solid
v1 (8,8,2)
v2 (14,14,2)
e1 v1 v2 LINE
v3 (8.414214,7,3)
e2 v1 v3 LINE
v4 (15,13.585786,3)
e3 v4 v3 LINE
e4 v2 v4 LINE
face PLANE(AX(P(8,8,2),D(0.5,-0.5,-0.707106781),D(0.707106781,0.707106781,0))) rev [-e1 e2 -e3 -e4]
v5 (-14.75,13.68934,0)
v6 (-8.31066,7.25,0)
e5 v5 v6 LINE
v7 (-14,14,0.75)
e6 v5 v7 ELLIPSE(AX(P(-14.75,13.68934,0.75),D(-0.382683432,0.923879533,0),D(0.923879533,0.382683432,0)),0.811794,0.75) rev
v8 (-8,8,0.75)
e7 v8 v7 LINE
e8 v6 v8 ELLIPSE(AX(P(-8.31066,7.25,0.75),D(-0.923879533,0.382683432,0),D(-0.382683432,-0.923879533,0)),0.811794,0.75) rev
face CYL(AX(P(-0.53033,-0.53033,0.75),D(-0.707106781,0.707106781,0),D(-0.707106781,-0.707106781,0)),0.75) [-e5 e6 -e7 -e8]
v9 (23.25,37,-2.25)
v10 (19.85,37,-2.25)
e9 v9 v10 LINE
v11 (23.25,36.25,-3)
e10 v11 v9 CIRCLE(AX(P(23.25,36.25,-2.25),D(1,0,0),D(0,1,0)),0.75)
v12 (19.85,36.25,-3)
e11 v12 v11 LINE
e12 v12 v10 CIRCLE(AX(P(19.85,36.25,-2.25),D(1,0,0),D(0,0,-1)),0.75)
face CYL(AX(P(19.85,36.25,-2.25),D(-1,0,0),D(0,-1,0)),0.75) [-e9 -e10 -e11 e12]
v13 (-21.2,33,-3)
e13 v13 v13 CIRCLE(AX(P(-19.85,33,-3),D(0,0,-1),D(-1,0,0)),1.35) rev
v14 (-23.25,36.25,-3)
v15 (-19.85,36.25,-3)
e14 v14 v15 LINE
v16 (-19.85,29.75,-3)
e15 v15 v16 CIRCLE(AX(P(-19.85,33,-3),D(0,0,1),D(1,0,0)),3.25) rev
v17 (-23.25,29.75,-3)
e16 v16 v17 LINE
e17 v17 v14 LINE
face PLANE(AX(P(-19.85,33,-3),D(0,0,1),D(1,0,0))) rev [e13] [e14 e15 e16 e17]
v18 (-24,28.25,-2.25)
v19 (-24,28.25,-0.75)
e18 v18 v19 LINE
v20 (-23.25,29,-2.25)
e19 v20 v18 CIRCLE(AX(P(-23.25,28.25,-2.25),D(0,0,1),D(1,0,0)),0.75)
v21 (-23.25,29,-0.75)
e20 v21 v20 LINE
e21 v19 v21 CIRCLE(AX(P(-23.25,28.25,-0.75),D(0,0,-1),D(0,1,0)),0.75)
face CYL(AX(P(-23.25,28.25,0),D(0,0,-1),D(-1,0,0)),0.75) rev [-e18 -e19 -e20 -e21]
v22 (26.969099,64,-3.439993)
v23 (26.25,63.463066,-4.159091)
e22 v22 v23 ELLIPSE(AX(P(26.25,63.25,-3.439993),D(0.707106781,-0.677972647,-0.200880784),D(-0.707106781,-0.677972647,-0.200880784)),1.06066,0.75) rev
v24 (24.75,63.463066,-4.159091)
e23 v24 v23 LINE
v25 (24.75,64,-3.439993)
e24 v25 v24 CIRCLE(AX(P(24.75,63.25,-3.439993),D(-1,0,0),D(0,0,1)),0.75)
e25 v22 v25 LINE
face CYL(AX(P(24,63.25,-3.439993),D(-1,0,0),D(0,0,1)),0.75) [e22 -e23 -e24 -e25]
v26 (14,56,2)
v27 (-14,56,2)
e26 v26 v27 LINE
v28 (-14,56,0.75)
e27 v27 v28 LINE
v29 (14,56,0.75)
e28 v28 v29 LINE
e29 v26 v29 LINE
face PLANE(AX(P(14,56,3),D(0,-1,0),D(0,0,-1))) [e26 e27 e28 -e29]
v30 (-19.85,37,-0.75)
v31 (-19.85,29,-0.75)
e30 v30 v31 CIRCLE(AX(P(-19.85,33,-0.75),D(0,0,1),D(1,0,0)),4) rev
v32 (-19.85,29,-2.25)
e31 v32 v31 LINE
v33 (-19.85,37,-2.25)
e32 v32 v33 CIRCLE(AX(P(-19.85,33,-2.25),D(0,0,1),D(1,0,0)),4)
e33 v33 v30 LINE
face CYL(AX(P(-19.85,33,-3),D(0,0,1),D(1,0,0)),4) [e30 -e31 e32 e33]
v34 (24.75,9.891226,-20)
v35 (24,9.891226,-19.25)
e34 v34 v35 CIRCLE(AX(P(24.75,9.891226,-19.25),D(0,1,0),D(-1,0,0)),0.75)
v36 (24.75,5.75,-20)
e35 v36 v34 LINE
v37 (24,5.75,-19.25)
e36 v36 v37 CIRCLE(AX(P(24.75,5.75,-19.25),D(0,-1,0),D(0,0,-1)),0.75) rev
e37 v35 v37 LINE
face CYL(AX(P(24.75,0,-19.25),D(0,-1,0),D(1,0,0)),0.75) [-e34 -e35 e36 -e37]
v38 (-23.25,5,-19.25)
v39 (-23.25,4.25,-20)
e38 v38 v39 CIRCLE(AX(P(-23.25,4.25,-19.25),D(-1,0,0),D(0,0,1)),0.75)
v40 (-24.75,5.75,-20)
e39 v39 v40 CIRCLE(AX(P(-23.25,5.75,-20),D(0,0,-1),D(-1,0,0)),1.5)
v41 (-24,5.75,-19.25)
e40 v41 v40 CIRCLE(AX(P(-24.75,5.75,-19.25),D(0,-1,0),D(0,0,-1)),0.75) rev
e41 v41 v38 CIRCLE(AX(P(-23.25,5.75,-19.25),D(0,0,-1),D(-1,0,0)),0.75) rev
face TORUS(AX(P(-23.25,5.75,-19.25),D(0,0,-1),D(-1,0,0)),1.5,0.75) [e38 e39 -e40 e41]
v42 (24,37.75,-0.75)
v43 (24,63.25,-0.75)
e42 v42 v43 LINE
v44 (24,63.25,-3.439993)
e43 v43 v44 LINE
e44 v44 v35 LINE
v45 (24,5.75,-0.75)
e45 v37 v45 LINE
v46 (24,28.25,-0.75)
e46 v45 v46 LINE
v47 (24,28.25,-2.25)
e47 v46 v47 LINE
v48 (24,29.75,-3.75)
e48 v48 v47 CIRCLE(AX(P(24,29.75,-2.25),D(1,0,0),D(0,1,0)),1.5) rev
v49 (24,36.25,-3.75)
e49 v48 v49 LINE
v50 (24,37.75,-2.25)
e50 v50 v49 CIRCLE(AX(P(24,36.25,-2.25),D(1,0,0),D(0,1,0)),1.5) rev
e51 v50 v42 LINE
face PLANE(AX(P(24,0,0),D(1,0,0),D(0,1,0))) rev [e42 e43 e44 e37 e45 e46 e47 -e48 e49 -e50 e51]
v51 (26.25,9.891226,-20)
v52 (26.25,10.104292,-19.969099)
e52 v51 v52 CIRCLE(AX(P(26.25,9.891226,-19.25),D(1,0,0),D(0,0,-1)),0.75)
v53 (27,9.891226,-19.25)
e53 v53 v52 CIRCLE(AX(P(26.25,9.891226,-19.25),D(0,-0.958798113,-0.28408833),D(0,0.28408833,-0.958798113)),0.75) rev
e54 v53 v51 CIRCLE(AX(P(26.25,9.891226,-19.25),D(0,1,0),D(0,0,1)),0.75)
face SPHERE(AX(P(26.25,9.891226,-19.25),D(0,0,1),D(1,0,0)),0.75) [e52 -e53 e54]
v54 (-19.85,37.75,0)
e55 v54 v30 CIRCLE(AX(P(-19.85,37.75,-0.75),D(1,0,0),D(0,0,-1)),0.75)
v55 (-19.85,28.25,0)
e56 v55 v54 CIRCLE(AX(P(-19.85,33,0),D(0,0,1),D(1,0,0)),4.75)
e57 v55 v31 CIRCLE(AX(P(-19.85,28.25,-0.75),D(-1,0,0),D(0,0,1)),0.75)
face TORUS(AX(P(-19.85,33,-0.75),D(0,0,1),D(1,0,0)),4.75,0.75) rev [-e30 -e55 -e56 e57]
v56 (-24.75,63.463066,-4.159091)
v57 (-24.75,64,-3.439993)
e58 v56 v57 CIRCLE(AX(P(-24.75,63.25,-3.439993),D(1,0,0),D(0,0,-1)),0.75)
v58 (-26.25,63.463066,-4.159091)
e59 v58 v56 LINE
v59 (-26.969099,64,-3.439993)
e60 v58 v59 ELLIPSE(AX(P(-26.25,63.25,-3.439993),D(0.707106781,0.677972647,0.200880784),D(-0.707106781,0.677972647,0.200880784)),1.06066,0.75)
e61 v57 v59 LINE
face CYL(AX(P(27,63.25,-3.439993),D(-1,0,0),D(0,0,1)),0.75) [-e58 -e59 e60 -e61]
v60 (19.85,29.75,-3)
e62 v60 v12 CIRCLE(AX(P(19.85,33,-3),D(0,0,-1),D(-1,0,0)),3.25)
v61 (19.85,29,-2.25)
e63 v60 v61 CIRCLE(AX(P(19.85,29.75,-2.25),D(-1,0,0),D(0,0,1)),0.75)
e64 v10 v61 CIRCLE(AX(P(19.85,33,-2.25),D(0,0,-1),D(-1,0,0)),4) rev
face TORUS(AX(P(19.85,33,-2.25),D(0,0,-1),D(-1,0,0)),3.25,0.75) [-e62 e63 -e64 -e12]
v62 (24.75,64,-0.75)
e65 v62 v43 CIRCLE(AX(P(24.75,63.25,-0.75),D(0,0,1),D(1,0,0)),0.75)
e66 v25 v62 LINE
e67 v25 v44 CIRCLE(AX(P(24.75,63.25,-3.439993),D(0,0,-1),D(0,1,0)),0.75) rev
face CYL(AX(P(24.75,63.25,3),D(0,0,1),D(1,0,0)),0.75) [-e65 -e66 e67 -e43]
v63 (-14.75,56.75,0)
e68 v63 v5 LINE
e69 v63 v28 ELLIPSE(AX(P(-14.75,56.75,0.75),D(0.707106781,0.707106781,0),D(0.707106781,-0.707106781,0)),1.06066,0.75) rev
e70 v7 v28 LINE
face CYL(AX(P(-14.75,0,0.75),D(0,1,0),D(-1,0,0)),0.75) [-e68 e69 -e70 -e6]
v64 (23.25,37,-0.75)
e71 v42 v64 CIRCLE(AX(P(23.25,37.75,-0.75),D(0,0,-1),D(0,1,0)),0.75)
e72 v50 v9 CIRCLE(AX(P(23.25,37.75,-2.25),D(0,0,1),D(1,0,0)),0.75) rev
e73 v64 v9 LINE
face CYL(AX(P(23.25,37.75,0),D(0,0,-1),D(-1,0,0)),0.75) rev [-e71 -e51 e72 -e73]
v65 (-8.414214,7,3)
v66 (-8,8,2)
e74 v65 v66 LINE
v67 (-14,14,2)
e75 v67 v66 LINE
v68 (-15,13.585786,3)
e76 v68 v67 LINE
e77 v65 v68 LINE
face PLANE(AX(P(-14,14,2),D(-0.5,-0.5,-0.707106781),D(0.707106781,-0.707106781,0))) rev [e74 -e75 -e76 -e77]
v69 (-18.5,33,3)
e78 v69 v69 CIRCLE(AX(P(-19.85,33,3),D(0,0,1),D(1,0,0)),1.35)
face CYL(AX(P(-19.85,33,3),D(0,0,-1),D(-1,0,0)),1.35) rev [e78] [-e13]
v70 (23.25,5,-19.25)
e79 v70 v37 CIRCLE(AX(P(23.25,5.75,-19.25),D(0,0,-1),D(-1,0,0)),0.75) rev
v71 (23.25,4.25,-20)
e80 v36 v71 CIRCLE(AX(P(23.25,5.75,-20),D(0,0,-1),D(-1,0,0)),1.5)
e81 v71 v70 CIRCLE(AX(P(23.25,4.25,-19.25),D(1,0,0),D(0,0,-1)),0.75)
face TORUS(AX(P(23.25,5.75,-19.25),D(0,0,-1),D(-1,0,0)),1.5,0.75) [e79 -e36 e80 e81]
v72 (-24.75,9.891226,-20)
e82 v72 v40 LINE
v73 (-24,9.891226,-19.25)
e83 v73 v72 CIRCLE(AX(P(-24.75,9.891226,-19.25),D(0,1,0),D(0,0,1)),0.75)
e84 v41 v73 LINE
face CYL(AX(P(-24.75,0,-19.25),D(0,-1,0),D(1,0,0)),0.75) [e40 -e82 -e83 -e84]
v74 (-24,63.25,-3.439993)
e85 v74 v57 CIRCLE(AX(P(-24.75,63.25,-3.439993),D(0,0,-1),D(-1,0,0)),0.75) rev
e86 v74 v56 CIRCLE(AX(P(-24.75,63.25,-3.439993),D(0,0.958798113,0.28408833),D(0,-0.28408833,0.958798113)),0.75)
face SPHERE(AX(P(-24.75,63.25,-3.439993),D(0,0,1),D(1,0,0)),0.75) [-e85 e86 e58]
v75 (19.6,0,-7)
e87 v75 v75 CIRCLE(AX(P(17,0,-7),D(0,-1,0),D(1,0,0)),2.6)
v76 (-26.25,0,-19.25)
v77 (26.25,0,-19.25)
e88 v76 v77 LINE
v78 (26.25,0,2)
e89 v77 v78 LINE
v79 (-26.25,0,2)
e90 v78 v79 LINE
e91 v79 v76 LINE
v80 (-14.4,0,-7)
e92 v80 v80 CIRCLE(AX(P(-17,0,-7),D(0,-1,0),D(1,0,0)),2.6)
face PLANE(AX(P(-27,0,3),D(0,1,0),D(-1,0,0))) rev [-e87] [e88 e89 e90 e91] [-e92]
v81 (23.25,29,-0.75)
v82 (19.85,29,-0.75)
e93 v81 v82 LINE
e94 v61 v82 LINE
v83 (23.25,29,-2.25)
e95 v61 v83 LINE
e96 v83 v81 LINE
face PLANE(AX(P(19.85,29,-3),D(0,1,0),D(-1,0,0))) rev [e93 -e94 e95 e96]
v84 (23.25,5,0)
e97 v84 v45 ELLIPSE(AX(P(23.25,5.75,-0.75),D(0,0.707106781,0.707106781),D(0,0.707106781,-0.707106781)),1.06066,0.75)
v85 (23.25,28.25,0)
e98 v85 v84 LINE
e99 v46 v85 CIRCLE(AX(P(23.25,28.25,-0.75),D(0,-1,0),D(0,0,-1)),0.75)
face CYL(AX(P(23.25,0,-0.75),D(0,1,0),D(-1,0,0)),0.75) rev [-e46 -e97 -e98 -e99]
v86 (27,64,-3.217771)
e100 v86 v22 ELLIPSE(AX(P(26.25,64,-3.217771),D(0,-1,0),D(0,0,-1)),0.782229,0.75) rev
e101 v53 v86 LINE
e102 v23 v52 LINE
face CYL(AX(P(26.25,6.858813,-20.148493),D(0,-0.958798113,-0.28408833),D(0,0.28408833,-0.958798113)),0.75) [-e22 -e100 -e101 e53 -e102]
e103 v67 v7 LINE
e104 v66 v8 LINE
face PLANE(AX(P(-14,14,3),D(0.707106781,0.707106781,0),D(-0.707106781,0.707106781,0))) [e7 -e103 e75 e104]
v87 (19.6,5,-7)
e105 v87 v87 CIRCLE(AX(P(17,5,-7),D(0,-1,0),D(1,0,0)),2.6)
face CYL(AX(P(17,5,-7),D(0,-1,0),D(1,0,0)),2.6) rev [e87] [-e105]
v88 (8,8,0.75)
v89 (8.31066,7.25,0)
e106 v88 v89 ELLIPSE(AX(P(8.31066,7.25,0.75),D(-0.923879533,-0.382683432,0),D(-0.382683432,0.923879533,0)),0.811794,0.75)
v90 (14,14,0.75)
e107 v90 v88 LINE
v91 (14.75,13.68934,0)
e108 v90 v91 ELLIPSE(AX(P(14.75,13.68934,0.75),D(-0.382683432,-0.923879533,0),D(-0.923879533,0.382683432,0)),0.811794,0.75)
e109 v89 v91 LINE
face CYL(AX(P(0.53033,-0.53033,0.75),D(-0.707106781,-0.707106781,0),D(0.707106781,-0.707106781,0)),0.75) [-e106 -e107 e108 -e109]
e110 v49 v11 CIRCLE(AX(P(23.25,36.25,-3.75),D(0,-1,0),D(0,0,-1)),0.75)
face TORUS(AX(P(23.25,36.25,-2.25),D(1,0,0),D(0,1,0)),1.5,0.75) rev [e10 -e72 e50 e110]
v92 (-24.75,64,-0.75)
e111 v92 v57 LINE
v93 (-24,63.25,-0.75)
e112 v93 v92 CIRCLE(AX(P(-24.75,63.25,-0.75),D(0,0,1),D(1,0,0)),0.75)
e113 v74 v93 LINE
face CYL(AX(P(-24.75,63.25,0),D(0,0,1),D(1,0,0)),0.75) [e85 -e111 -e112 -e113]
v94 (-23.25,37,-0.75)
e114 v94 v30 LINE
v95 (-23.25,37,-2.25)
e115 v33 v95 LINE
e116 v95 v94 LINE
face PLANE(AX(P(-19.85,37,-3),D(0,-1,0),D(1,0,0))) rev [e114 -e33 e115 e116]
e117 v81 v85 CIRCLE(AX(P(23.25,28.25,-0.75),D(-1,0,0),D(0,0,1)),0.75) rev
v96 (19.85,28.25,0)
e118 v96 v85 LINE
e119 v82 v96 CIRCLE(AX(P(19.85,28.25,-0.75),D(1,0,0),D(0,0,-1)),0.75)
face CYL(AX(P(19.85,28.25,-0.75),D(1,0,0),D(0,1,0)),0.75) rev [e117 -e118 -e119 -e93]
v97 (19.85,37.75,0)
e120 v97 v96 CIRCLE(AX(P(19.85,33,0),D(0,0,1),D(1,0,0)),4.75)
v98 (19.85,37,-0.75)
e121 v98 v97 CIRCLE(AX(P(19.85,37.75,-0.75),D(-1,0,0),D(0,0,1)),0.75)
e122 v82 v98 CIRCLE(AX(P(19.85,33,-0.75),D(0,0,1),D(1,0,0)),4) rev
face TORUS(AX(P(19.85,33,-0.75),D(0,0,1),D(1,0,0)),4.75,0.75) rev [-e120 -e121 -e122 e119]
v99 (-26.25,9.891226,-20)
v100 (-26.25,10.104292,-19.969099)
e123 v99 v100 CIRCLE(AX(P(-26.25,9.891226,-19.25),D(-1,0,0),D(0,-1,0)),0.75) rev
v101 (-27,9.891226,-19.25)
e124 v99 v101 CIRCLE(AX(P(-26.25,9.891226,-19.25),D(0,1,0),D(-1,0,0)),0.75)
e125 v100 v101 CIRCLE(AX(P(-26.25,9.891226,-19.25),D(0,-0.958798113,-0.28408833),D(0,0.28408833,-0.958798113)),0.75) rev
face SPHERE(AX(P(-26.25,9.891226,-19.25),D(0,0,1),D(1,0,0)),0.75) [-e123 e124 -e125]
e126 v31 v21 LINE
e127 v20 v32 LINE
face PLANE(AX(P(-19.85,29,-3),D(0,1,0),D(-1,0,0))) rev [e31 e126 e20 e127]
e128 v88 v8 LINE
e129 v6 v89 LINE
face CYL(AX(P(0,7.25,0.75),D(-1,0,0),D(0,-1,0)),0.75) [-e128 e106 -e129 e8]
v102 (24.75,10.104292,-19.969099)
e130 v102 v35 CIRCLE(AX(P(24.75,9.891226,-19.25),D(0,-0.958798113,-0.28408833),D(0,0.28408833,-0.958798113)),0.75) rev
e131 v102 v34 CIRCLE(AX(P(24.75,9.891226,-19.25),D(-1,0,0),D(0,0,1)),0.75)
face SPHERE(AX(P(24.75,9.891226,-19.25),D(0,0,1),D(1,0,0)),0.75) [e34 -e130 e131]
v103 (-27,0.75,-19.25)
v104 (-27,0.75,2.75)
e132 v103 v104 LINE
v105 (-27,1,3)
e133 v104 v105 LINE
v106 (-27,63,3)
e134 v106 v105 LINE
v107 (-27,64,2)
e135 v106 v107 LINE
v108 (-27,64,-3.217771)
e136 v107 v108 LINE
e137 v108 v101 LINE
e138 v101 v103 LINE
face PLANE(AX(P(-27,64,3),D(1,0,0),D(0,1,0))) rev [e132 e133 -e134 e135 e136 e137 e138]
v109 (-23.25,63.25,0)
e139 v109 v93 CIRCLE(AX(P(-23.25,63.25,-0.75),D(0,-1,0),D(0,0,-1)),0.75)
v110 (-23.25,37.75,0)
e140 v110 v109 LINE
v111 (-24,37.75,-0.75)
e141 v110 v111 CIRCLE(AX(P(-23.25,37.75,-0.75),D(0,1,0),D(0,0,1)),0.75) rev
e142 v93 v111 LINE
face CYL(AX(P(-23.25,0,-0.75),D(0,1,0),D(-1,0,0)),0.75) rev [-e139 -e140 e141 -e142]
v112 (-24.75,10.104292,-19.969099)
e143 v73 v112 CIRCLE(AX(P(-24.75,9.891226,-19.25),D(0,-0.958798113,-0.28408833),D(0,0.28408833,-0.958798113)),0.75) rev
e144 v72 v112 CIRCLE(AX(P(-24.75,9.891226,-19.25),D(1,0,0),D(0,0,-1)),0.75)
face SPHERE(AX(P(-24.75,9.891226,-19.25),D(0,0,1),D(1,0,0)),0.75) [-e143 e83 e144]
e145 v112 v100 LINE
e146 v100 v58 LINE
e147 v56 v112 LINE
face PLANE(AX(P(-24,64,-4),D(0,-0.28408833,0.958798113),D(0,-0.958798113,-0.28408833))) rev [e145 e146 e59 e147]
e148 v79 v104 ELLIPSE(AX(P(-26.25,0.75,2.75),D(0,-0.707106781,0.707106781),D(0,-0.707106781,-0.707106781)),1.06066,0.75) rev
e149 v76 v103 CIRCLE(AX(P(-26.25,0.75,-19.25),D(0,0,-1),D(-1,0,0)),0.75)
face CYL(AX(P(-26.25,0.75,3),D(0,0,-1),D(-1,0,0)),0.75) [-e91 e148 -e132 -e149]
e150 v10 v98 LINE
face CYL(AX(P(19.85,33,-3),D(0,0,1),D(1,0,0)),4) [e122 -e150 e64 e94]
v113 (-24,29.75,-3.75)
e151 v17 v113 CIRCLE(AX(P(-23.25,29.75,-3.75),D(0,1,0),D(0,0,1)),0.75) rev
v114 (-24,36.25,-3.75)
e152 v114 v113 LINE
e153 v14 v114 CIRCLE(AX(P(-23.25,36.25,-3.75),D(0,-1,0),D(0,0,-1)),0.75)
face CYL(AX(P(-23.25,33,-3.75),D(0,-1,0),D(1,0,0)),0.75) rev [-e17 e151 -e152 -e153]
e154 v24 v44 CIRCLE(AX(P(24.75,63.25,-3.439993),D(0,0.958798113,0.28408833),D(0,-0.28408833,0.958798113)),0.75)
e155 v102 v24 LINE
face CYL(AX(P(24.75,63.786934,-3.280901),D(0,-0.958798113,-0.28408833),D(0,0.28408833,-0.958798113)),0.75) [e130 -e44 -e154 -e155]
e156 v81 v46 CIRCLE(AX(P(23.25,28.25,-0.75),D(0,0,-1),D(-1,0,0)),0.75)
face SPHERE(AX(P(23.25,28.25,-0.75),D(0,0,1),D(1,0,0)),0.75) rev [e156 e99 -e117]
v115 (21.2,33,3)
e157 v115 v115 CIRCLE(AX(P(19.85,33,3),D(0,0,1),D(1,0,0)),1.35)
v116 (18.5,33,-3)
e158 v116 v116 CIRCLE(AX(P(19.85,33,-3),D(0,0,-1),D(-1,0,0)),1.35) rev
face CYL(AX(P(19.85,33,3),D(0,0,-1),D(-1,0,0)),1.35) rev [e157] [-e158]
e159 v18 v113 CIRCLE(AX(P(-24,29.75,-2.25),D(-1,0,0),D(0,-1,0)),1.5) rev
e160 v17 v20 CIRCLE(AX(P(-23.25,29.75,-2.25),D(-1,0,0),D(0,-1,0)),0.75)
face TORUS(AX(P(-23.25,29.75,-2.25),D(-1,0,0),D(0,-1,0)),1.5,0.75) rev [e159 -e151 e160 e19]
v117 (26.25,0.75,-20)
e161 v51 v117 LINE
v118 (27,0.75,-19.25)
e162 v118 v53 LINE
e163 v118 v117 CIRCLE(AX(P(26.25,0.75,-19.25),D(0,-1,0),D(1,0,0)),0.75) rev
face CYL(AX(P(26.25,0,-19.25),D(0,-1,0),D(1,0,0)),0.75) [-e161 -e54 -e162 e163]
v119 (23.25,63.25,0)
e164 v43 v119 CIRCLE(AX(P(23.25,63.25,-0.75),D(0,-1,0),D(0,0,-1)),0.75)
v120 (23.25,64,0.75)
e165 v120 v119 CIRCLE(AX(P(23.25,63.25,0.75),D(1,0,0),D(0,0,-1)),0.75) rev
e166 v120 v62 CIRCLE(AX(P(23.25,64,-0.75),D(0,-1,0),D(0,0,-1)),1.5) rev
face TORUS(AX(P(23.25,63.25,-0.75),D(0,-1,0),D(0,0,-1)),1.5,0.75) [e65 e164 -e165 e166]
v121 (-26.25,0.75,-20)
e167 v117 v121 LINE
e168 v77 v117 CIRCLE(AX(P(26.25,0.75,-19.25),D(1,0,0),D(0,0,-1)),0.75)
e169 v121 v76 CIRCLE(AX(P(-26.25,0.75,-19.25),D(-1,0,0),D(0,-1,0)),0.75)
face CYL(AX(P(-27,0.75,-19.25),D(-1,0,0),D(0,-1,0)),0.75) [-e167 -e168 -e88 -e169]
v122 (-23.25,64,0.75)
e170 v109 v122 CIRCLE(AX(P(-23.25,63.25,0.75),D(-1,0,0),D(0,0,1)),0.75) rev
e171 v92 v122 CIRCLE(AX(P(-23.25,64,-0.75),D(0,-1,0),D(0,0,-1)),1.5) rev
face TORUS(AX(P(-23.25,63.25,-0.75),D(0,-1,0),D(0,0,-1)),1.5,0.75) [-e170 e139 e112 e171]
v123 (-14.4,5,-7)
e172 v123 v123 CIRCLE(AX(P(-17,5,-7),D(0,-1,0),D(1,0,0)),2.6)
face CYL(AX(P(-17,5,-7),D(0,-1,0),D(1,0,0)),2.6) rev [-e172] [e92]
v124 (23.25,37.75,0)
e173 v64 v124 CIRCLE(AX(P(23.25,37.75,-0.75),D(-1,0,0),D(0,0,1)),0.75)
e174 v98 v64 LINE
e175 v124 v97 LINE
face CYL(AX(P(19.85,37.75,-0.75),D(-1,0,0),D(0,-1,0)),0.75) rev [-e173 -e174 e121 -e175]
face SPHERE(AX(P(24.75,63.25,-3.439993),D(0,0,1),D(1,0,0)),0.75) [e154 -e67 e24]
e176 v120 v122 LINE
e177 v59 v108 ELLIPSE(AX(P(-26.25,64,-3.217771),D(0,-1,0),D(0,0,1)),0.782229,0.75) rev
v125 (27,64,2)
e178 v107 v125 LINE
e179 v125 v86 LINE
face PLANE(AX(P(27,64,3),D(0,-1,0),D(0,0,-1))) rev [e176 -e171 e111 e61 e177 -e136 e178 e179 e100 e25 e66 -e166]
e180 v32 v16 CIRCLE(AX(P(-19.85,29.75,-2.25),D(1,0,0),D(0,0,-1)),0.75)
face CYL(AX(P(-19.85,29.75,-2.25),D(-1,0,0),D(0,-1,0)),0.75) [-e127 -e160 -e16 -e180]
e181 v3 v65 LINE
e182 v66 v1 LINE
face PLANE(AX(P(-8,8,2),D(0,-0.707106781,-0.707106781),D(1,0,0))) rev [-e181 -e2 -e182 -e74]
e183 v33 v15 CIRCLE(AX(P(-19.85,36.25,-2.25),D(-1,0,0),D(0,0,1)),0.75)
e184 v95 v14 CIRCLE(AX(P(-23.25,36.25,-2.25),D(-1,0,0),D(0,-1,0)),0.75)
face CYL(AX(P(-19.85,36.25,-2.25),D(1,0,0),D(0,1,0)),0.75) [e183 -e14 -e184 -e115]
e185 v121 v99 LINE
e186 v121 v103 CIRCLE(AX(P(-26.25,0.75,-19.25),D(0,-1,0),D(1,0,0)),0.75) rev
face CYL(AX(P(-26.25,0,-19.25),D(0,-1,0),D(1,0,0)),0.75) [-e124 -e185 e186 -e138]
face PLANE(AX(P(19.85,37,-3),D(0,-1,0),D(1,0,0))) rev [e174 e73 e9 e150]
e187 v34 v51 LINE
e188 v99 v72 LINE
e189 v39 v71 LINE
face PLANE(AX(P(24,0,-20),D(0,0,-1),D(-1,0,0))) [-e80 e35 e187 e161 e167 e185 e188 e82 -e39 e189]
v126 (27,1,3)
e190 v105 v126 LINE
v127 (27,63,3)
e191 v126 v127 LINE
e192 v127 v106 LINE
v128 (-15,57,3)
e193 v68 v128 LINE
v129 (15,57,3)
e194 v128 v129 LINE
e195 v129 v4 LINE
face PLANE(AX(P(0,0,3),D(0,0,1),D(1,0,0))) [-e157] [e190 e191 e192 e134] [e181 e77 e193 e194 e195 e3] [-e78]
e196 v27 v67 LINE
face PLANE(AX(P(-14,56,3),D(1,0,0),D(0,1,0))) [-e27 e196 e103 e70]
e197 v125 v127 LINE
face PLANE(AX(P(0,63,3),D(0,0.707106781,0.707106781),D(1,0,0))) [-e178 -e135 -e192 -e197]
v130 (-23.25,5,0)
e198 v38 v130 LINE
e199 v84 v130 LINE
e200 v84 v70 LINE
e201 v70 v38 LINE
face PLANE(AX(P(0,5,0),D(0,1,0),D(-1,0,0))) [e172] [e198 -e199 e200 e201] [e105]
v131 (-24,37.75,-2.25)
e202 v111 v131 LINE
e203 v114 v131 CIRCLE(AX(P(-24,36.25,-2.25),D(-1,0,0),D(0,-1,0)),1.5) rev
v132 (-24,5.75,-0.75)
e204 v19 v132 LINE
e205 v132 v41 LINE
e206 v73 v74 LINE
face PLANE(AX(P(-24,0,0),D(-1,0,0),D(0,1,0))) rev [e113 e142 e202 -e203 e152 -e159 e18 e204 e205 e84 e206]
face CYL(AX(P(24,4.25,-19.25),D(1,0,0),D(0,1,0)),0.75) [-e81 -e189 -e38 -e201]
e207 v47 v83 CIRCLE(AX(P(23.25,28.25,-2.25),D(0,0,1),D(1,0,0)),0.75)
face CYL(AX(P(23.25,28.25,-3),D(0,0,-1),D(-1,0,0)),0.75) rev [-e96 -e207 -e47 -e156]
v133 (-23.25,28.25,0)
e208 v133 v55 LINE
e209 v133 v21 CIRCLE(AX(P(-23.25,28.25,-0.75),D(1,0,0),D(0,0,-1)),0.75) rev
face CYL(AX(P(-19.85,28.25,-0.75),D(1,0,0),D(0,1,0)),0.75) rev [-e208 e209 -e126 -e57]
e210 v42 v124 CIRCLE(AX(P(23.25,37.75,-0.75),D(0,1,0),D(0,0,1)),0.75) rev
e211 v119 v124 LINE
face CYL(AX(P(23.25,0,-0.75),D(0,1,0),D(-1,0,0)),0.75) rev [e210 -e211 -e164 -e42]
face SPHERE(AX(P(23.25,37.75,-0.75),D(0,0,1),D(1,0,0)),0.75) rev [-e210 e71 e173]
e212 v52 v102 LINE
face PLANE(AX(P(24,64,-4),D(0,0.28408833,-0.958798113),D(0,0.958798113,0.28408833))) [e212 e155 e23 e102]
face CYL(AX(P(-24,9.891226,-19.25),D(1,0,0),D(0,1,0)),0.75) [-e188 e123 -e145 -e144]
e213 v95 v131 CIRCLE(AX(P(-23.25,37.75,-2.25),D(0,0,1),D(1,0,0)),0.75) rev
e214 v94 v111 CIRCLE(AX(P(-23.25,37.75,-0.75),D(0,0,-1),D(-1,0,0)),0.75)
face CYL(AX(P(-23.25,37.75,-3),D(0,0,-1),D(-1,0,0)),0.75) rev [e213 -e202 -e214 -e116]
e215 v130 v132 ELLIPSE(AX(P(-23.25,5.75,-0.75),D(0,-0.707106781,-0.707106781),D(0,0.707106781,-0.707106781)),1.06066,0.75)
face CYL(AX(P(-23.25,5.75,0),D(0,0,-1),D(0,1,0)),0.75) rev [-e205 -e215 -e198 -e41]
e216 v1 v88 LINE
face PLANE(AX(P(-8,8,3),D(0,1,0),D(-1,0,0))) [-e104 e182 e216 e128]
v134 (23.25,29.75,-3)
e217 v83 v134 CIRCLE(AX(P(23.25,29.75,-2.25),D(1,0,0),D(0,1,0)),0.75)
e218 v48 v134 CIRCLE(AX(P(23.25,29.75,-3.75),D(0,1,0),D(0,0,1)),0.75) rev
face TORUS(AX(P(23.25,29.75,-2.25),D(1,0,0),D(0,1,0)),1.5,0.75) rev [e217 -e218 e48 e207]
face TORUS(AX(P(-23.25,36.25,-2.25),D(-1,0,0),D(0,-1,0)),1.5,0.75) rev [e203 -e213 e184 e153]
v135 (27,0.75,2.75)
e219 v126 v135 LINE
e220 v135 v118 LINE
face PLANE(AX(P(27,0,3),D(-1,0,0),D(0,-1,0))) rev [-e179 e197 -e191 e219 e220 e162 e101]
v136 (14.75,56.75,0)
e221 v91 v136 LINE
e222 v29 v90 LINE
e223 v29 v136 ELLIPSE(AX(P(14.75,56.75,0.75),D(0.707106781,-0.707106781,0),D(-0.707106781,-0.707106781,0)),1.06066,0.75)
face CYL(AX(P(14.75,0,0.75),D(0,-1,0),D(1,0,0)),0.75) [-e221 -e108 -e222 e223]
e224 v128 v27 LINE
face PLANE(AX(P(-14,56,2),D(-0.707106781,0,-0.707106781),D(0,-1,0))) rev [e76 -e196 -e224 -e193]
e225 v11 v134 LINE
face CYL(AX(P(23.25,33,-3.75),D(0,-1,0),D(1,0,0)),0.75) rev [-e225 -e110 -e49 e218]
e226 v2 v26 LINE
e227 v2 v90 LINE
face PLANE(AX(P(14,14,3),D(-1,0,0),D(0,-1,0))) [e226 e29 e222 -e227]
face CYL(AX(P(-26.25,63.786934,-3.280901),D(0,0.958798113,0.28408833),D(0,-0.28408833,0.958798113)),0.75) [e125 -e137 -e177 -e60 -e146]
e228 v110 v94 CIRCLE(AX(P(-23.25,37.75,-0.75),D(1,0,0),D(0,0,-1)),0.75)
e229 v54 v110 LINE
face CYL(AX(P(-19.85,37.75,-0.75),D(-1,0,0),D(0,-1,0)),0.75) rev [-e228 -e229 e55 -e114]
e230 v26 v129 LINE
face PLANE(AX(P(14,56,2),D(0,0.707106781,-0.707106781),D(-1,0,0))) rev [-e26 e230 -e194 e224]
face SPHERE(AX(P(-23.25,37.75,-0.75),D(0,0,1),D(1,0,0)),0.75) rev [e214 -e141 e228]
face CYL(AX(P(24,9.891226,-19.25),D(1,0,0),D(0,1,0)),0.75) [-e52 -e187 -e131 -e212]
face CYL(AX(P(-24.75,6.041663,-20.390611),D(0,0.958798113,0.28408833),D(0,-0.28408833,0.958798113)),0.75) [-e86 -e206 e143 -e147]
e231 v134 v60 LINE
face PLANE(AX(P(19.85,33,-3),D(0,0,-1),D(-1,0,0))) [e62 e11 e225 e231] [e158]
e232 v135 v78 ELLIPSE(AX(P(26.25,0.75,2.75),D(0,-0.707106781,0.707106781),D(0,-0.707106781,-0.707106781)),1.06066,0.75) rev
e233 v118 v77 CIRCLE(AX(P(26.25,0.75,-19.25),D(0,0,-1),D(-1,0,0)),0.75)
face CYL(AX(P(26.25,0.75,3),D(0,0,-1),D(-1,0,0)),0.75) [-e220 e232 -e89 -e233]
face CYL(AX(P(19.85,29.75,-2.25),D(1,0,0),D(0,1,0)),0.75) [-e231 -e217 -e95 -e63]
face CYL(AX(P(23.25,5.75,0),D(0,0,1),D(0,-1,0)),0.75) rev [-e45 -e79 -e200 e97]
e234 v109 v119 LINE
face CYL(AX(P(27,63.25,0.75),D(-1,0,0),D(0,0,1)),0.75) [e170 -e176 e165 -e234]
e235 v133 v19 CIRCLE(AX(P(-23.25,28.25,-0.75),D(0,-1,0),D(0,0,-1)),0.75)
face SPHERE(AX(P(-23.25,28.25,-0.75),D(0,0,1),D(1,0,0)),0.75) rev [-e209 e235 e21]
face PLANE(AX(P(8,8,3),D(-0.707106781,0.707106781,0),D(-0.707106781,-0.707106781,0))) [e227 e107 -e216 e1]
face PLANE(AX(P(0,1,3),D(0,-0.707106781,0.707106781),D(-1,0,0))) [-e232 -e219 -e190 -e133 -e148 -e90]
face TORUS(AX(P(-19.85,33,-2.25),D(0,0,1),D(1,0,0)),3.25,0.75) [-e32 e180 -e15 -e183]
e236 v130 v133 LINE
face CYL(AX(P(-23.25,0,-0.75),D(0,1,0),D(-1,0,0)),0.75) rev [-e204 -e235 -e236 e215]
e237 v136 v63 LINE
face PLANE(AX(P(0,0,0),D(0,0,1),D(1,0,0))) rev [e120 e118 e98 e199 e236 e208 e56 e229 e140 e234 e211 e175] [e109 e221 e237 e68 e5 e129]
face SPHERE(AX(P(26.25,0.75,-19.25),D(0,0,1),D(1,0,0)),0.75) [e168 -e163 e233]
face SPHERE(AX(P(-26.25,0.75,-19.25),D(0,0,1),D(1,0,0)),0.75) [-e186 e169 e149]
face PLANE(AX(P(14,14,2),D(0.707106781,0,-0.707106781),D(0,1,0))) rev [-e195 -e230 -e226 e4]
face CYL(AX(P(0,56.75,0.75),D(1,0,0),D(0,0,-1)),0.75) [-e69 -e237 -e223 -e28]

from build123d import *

# Parameters (mm, degrees)
SKETCH1_W           = 54
SKETCH1_H           = 64
SKETCH1_R           = 1.35
BOSS_EXTRUDE1_DEPTH = 3
BOSS_EXTRUDE2_DEPTH = 3
BOSS_EXTRUDE3_DEPTH = 3
CUT_EXTRUDE2_START  = -3
SKETCH4_R           = 1.35
CUT_EXTRUDE2_DEPTH  = 3
SKETCH5_W           = 48
SKETCH5_H           = 20
SKETCH5_R           = 2.6
BOSS_EXTRUDE4_DEPTH = 5
FILLET3_R           = 0.75
CHAMFER1_SIZE       = 1


with BuildPart() as part:
    # Sketch1 → Boss-Extrude1 (new body)
    with BuildSketch(Plane.XY):
        with Locations((0, 32)):
            Rectangle(SKETCH1_W, SKETCH1_H)
        with Locations((-19.85, 33)):
            Circle(SKETCH1_R, mode=Mode.SUBTRACT)
        with Locations((19.85, 33)):
            Circle(SKETCH1_R, mode=Mode.SUBTRACT)
        Polygon((-8, 8), (8, 8), (14, 14), (14, 56), (-14, 56), (-14, 14), align=None, mode=Mode.SUBTRACT)
    extrude(amount=BOSS_EXTRUDE1_DEPTH)

    # Sketch2 → Boss-Extrude2 (add)
    with BuildSketch(Plane(origin=(27, 0, 0), x_dir=(0, 0, -1), z_dir=(1, 0, 0))):
        Polygon((0, 64), (0, 0), (20, 0), (20, 10), (4, 64), align=None)
    boss_extrude2 = extrude(amount=-BOSS_EXTRUDE2_DEPTH)

    # Mirror1: Boss-Extrude2 across plane
    add(boss_extrude2.mirror(Plane(origin=(0, 0, 0), x_dir=(0, 0, 1), z_dir=(1, 0, 0))))

    # Sketch3 → Boss-Extrude3 (add)
    with BuildSketch(Plane(origin=(0, 0, 0), x_dir=(-1, 0, 0), z_dir=(0, 0, -1))):
        with BuildLine():
            Line((-19.85, 37), (-24, 37))
            Line((-24, 37), (-24, 29))
            Line((-24, 29), (-19.85, 29))
            ThreePointArc((-19.85, 29), (-15.85, 33), (-19.85, 37))
        make_face()
        with BuildLine():
            Line((24, 29), (24, 37))
            Line((24, 37), (19.85, 37))
            ThreePointArc((19.85, 37), (15.85, 33), (19.85, 29))
            Line((19.85, 29), (24, 29))
        make_face()
    extrude(amount=BOSS_EXTRUDE3_DEPTH)

    # Sketch4 → Cut-Extrude2 (cut)
    with BuildSketch(Plane.XY.offset(CUT_EXTRUDE2_START)):
        with Locations(Location((-19.85, 33, 0), (0, 0, 180))):
            Circle(SKETCH4_R)
        with Locations(Location((19.85, 33, 0), (0, 0, 180))):
            Circle(SKETCH4_R)
    extrude(amount=CUT_EXTRUDE2_DEPTH, mode=Mode.SUBTRACT)

    # Sketch5 → Boss-Extrude4 (add)
    with BuildSketch(Plane.XZ):
        with Locations((0, -10)):
            Rectangle(SKETCH5_W, SKETCH5_H)
        with Locations((-17, -7)):
            Circle(SKETCH5_R, mode=Mode.SUBTRACT)
        with Locations((17, -7)):
            Circle(SKETCH5_R, mode=Mode.SUBTRACT)
    extrude(amount=-BOSS_EXTRUDE4_DEPTH)

    # Fillet3
    fillet3_edges = [part.edges().sort_by_distance(p)[0] for p in [
        (-24, 7.5, -20),
        (24, 7.5, -20),
        (24, 5, -10),
        (0, 5, -20),
        (-24, 5, -10),
        (-11, 11, 0),
        (0, 8, 0),
        (11, 11, 0),
        (14, 35, 0),
        (0, 56, 0),
        (-14, 35, 0),
        (0, 64, 0),
        (24, 64, -2),
        (24, 37, -12),
        (25.5, 64, -4),
        (25.5, 10, -20),
        (0, 0, -20),
        (24, 50.5, 0),
        (27, 5, -20),
        (27, 37, -12),
        (-25.5, 64, -4),
        (-27, 5, -20),
        (-27, 37, -12),
        (-25.5, 10, -20),
        (-24, 64, -2),
        (-24, 50.5, 0),
        (-24, 37, -12),
        (24, 17, 0),
        (27, 0, -8.5),
        (-27, 0, -8.5),
        (15.85, 33, 0),
        (21.925, 37, 0),
        (24, 37, -1.5),
        (21.925, 29, 0),
        (24, 29, -1.5),
        (15.85, 33, -3),
        (21.925, 37, -3),
        (24, 33, -3),
        (21.925, 29, -3),
        (-24, 17, 0),
        (-15.85, 33, 0),
        (-21.925, 29, 0),
        (-24, 29, -1.5),
        (-21.925, 37, 0),
        (-24, 37, -1.5),
        (-15.85, 33, -3),
        (-21.925, 29, -3),
        (-24, 33, -3),
        (-21.925, 37, -3),
    ]]
    fillet(fillet3_edges, radius=FILLET3_R)

    # Chamfer1
    # the kernel refuses this chamfer: 1 mm, written as the material it takes off along each edge
    with BuildSketch(Plane(origin=(29.571682988, 64, 3), x_dir=(0, -0.9996219169112968, 0.027495876610586414), z_dir=(-1, 0, 0))) as chamfer1_piece_1:
        Polygon((CHAMFER1_SIZE * 0.999621916911, -CHAMFER1_SIZE * 0.0274958766106), (-CHAMFER1_SIZE * 0.0274958766106, -CHAMFER1_SIZE * 0.999621916911), (0, 0), align=None)
    extrude(amount=59.143365976, mode=Mode.SUBTRACT)
    with BuildSketch(Plane(origin=(-28.821682988, 0, 3), x_dir=(0, -0.027495876610586382, -0.9996219169112968), z_dir=(1, 0, 0))) as chamfer1_piece_2:
        Polygon((CHAMFER1_SIZE * 0.999621916911, CHAMFER1_SIZE * 0.0274958766106), (-CHAMFER1_SIZE * 0.0274958766106, CHAMFER1_SIZE * 0.999621916911), (0, 0), align=None)
    extrude(amount=57.643365976, mode=Mode.SUBTRACT)
    with BuildSketch(Plane(origin=(-15.81845448, 15.81845448, 3), x_dir=(-0.7068394360706732, -0.7068394360706739, 0.027495876610586528), z_dir=(0.7071067811865478, -0.7071067811865472, 0))) as chamfer1_piece_3_section:
        Polygon((CHAMFER1_SIZE * 0.999621916911, CHAMFER1_SIZE * 0.0274958766106), (-CHAMFER1_SIZE * 0.0274958766106, CHAMFER1_SIZE * 0.999621916911), (0, 0), align=None)
    chamfer1_piece_3 = extrude(amount=13.62864735, mode=Mode.PRIVATE)
    chamfer1_piece_3 = split(chamfer1_piece_3, bisect_by=Plane(origin=(-14, 10.778276497, 2.66153015), z_dir=(1, 0, 0)), keep=Keep.TOP, mode=Mode.PRIVATE)
    chamfer1_piece_3 = split(chamfer1_piece_3, bisect_by=Plane(origin=(-11.221723503, 8, 2.66153015), z_dir=(0, 1, 0)), keep=Keep.TOP, mode=Mode.PRIVATE)
    add(chamfer1_piece_3, mode=Mode.SUBTRACT)
    with BuildSketch(Plane(origin=(-10.571682988, 8, 3), x_dir=(0, -0.9996219169112968, 0.027495876610586487), z_dir=(1, 0, 0))) as chamfer1_piece_4_section:
        Polygon((CHAMFER1_SIZE * 0.999621916911, CHAMFER1_SIZE * 0.0274958766106), (-CHAMFER1_SIZE * 0.0274958766106, CHAMFER1_SIZE * 0.999621916911), (0, 0), align=None)
    chamfer1_piece_4 = extrude(amount=21.143365976, mode=Mode.PRIVATE)
    chamfer1_piece_4 = split(chamfer1_piece_4, bisect_by=Plane(origin=(-3.839242746, 3.839242746, 2.665780321), z_dir=(0.7071067811865472, 0.7071067811865478, 0)), keep=Keep.TOP, mode=Mode.PRIVATE)
    chamfer1_piece_4 = split(chamfer1_piece_4, bisect_by=Plane(origin=(3.839242746, 3.839242746, 2.665780321), z_dir=(-0.7071067811865474, 0.7071067811865477, 0)), keep=Keep.TOP, mode=Mode.PRIVATE)
    add(chamfer1_piece_4, mode=Mode.SUBTRACT)
    with BuildSketch(Plane(origin=(6.18154552, 6.18154552, 3), x_dir=(0.7068394360706733, -0.7068394360706738, 0.027495876610586546), z_dir=(0.7071067811865477, 0.7071067811865474, 0))) as chamfer1_piece_5_section:
        Polygon((CHAMFER1_SIZE * 0.999621916911, CHAMFER1_SIZE * 0.0274958766106), (-CHAMFER1_SIZE * 0.0274958766106, CHAMFER1_SIZE * 0.999621916911), (0, 0), align=None)
    chamfer1_piece_5 = extrude(amount=13.62864735, mode=Mode.PRIVATE)
    chamfer1_piece_5 = split(chamfer1_piece_5, bisect_by=Plane(origin=(14, 10.778276497, 2.66153015), z_dir=(-1, 0, 0)), keep=Keep.TOP, mode=Mode.PRIVATE)
    chamfer1_piece_5 = split(chamfer1_piece_5, bisect_by=Plane(origin=(11.221723503, 8, 2.66153015), z_dir=(0, 1, 0)), keep=Keep.TOP, mode=Mode.PRIVATE)
    add(chamfer1_piece_5, mode=Mode.SUBTRACT)
    with BuildSketch(Plane(origin=(14, 11.428317012, 3), x_dir=(0.9996219169112968, 0, 0.02749587661058651), z_dir=(0, 1, 0))) as chamfer1_piece_6_section:
        Polygon((CHAMFER1_SIZE * 0.999621916911, CHAMFER1_SIZE * 0.0274958766106), (-CHAMFER1_SIZE * 0.0274958766106, CHAMFER1_SIZE * 0.999621916911), (0, 0), align=None)
    chamfer1_piece_6 = extrude(amount=44.571682988, mode=Mode.PRIVATE)
    chamfer1_piece_6 = split(chamfer1_piece_6, bisect_by=Plane(origin=(24.746202271, 24.746202271, 2.669391673), z_dir=(-0.7071067811865474, 0.7071067811865477, 0)), keep=Keep.TOP, mode=Mode.PRIVATE)
    add(chamfer1_piece_6, mode=Mode.SUBTRACT)
    with BuildSketch(Plane(origin=(14, 56, 3), x_dir=(0, 0.9996219169112968, 0.027495876610586414), z_dir=(-1, 0, 0))) as chamfer1_piece_7:
        Polygon((CHAMFER1_SIZE * 0.999621916911, CHAMFER1_SIZE * 0.0274958766106), (-CHAMFER1_SIZE * 0.0274958766106, CHAMFER1_SIZE * 0.999621916911), (0, 0), align=None)
    extrude(amount=28, mode=Mode.SUBTRACT)
    with BuildSketch(Plane(origin=(-14, 56, 3), x_dir=(-0.9996219169112968, 0, 0.02749587661058651), z_dir=(0, -1, 0))) as chamfer1_piece_8_section:
        Polygon((CHAMFER1_SIZE * 0.999621916911, CHAMFER1_SIZE * 0.0274958766106), (-CHAMFER1_SIZE * 0.0274958766106, CHAMFER1_SIZE * 0.999621916911), (0, 0), align=None)
    chamfer1_piece_8 = extrude(amount=44.571682988, mode=Mode.PRIVATE)
    chamfer1_piece_8 = split(chamfer1_piece_8, bisect_by=Plane(origin=(-24.746202271, 24.746202271, 2.669391673), z_dir=(0.7071067811865472, 0.7071067811865478, 0)), keep=Keep.TOP, mode=Mode.PRIVATE)
    add(chamfer1_piece_8, mode=Mode.SUBTRACT)
    with BuildSketch(Plane(origin=(-15.81845448, 15.81845448, 3), x_dir=(-0.7068394360706732, -0.7068394360706739, 0.027495876610586528), z_dir=(0.7071067811865478, -0.7071067811865472, 0))) as chamfer1_piece_9a_section:
        Polygon((CHAMFER1_SIZE * 0.999621916911, CHAMFER1_SIZE * 0.0274958766106), (-CHAMFER1_SIZE * 0.0274958766106, CHAMFER1_SIZE * 0.999621916911), (0, 0), align=None)
    chamfer1_piece_9a = extrude(amount=13.62864735, mode=Mode.PRIVATE)
    chamfer1_piece_9a = split(chamfer1_piece_9a, bisect_by=Plane(origin=(-14, 14.536214365, 2.681906875), z_dir=(-1, 0, 0)), keep=Keep.TOP, mode=Mode.PRIVATE)
    with BuildSketch(Plane(origin=(-14, 56, 3), x_dir=(-0.9996219169112968, 0, 0.02749587661058651), z_dir=(0, -1, 0))) as chamfer1_piece_9b_section:
        Polygon((CHAMFER1_SIZE * 0.999621916911, CHAMFER1_SIZE * 0.0274958766106), (-CHAMFER1_SIZE * 0.0274958766106, CHAMFER1_SIZE * 0.999621916911), (0, 0), align=None)
    chamfer1_piece_9b = extrude(amount=44.571682988, mode=Mode.PRIVATE)
    chamfer1_piece_9b = split(chamfer1_piece_9b, bisect_by=Plane(origin=(-13.620839187, 13.620839187, 2.681906875), z_dir=(-0.7071067811865472, -0.7071067811865478, 0)), keep=Keep.TOP, mode=Mode.PRIVATE)
    chamfer1_piece_9 = chamfer1_piece_9a & chamfer1_piece_9b
    add(chamfer1_piece_9, mode=Mode.SUBTRACT)
    with BuildSketch(Plane(origin=(-15.81845448, 15.81845448, 3), x_dir=(-0.7068394360706732, -0.7068394360706739, 0.027495876610586528), z_dir=(0.7071067811865478, -0.7071067811865472, 0))) as chamfer1_piece_10a_section:
        Polygon((CHAMFER1_SIZE * 0.999621916911, CHAMFER1_SIZE * 0.0274958766106), (-CHAMFER1_SIZE * 0.0274958766106, CHAMFER1_SIZE * 0.999621916911), (0, 0), align=None)
    chamfer1_piece_10a = extrude(amount=13.62864735, mode=Mode.PRIVATE)
    chamfer1_piece_10a = split(chamfer1_piece_10a, bisect_by=Plane(origin=(-7.463785635, 8, 2.681906875), z_dir=(0, -1, 0)), keep=Keep.TOP, mode=Mode.PRIVATE)
    with BuildSketch(Plane(origin=(-10.571682988, 8, 3), x_dir=(0, -0.9996219169112968, 0.027495876610586487), z_dir=(1, 0, 0))) as chamfer1_piece_10b_section:
        Polygon((CHAMFER1_SIZE * 0.999621916911, CHAMFER1_SIZE * 0.0274958766106), (-CHAMFER1_SIZE * 0.0274958766106, CHAMFER1_SIZE * 0.999621916911), (0, 0), align=None)
    chamfer1_piece_10b = extrude(amount=21.143365976, mode=Mode.PRIVATE)
    chamfer1_piece_10b = split(chamfer1_piece_10b, bisect_by=Plane(origin=(-8.379160813, 8.379160813, 2.681906875), z_dir=(-0.7071067811865472, -0.7071067811865478, 0)), keep=Keep.TOP, mode=Mode.PRIVATE)
    chamfer1_piece_10 = chamfer1_piece_10a & chamfer1_piece_10b
    add(chamfer1_piece_10, mode=Mode.SUBTRACT)
    with BuildSketch(Plane(origin=(6.18154552, 6.18154552, 3), x_dir=(0.7068394360706733, -0.7068394360706738, 0.027495876610586546), z_dir=(0.7071067811865477, 0.7071067811865474, 0))) as chamfer1_piece_11a_section:
        Polygon((CHAMFER1_SIZE * 0.999621916911, CHAMFER1_SIZE * 0.0274958766106), (-CHAMFER1_SIZE * 0.0274958766106, CHAMFER1_SIZE * 0.999621916911), (0, 0), align=None)
    chamfer1_piece_11a = extrude(amount=13.62864735, mode=Mode.PRIVATE)
    chamfer1_piece_11a = split(chamfer1_piece_11a, bisect_by=Plane(origin=(7.463785635, 8, 2.681906875), z_dir=(0, -1, 0)), keep=Keep.TOP, mode=Mode.PRIVATE)
    with BuildSketch(Plane(origin=(-10.571682988, 8, 3), x_dir=(0, -0.9996219169112968, 0.027495876610586487), z_dir=(1, 0, 0))) as chamfer1_piece_11b_section:
        Polygon((CHAMFER1_SIZE * 0.999621916911, CHAMFER1_SIZE * 0.0274958766106), (-CHAMFER1_SIZE * 0.0274958766106, CHAMFER1_SIZE * 0.999621916911), (0, 0), align=None)
    chamfer1_piece_11b = extrude(amount=21.143365976, mode=Mode.PRIVATE)
    chamfer1_piece_11b = split(chamfer1_piece_11b, bisect_by=Plane(origin=(8.379160813, 8.379160813, 2.681906875), z_dir=(0.7071067811865474, -0.7071067811865477, 0)), keep=Keep.TOP, mode=Mode.PRIVATE)
    chamfer1_piece_11 = chamfer1_piece_11a & chamfer1_piece_11b
    add(chamfer1_piece_11, mode=Mode.SUBTRACT)
    with BuildSketch(Plane(origin=(14, 11.428317012, 3), x_dir=(0.9996219169112968, 0, 0.02749587661058651), z_dir=(0, 1, 0))) as chamfer1_piece_12a_section:
        Polygon((CHAMFER1_SIZE * 0.999621916911, CHAMFER1_SIZE * 0.0274958766106), (-CHAMFER1_SIZE * 0.0274958766106, CHAMFER1_SIZE * 0.999621916911), (0, 0), align=None)
    chamfer1_piece_12a = extrude(amount=44.571682988, mode=Mode.PRIVATE)
    chamfer1_piece_12a = split(chamfer1_piece_12a, bisect_by=Plane(origin=(13.620839187, 13.620839187, 2.681906875), z_dir=(0.7071067811865474, -0.7071067811865477, 0)), keep=Keep.TOP, mode=Mode.PRIVATE)
    with BuildSketch(Plane(origin=(6.18154552, 6.18154552, 3), x_dir=(0.7068394360706733, -0.7068394360706738, 0.027495876610586546), z_dir=(0.7071067811865477, 0.7071067811865474, 0))) as chamfer1_piece_12b_section:
        Polygon((CHAMFER1_SIZE * 0.999621916911, CHAMFER1_SIZE * 0.0274958766106), (-CHAMFER1_SIZE * 0.0274958766106, CHAMFER1_SIZE * 0.999621916911), (0, 0), align=None)
    chamfer1_piece_12b = extrude(amount=13.62864735, mode=Mode.PRIVATE)
    chamfer1_piece_12b = split(chamfer1_piece_12b, bisect_by=Plane(origin=(14, 14.536214365, 2.681906875), z_dir=(1, 0, 0)), keep=Keep.TOP, mode=Mode.PRIVATE)
    chamfer1_piece_12 = chamfer1_piece_12a & chamfer1_piece_12b
    add(chamfer1_piece_12, mode=Mode.SUBTRACT)
    with BuildSketch(Plane(origin=(16.571682988, 56, 3), x_dir=(0, 0.9996219169112968, 0.027495876610586414), z_dir=(-1, 0, 0))) as chamfer1_piece_13a_section:
        Polygon((CHAMFER1_SIZE * 0.999621916911, CHAMFER1_SIZE * 0.0274958766106), (-CHAMFER1_SIZE * 0.0274958766106, CHAMFER1_SIZE * 0.999621916911), (0, 0), align=None)
    chamfer1_piece_13a = extrude(amount=30.571682988, mode=Mode.PRIVATE)
    chamfer1_piece_13a = split(chamfer1_piece_13a, bisect_by=Plane(origin=(14, 56.329793627, 2.670206373), z_dir=(1, 0, 0)), keep=Keep.TOP, mode=Mode.PRIVATE)
    with BuildSketch(Plane(origin=(14, 11.428317012, 3), x_dir=(0.9996219169112968, 0, 0.02749587661058651), z_dir=(0, 1, 0))) as chamfer1_piece_13b_section:
        Polygon((CHAMFER1_SIZE * 0.999621916911, CHAMFER1_SIZE * 0.0274958766106), (-CHAMFER1_SIZE * 0.0274958766106, CHAMFER1_SIZE * 0.999621916911), (0, 0), align=None)
    chamfer1_piece_13b = extrude(amount=47.143365976, mode=Mode.PRIVATE)
    chamfer1_piece_13b = split(chamfer1_piece_13b, bisect_by=Plane(origin=(14.329793627, 56, 2.670206373), z_dir=(0, 1, 0)), keep=Keep.TOP, mode=Mode.PRIVATE)
    chamfer1_piece_13 = chamfer1_piece_13a & chamfer1_piece_13b
    add(chamfer1_piece_13, mode=Mode.SUBTRACT)
    with BuildSketch(Plane(origin=(-14, 58.571682988, 3), x_dir=(-0.9996219169112968, 0, 0.02749587661058651), z_dir=(0, -1, 0))) as chamfer1_piece_14a_section:
        Polygon((CHAMFER1_SIZE * 0.999621916911, CHAMFER1_SIZE * 0.0274958766106), (-CHAMFER1_SIZE * 0.0274958766106, CHAMFER1_SIZE * 0.999621916911), (0, 0), align=None)
    chamfer1_piece_14a = extrude(amount=47.143365976, mode=Mode.PRIVATE)
    chamfer1_piece_14a = split(chamfer1_piece_14a, bisect_by=Plane(origin=(-14.329793627, 56, 2.670206373), z_dir=(0, 1, 0)), keep=Keep.TOP, mode=Mode.PRIVATE)
    with BuildSketch(Plane(origin=(14, 56, 3), x_dir=(0, 0.9996219169112968, 0.027495876610586414), z_dir=(-1, 0, 0))) as chamfer1_piece_14b_section:
        Polygon((CHAMFER1_SIZE * 0.999621916911, CHAMFER1_SIZE * 0.0274958766106), (-CHAMFER1_SIZE * 0.0274958766106, CHAMFER1_SIZE * 0.999621916911), (0, 0), align=None)
    chamfer1_piece_14b = extrude(amount=30.571682988, mode=Mode.PRIVATE)
    chamfer1_piece_14b = split(chamfer1_piece_14b, bisect_by=Plane(origin=(-14, 56.329793627, 2.670206373), z_dir=(-1, 0, 0)), keep=Keep.TOP, mode=Mode.PRIVATE)
    chamfer1_piece_14 = chamfer1_piece_14a & chamfer1_piece_14b
    add(chamfer1_piece_14, mode=Mode.SUBTRACT)


solid = part.part
